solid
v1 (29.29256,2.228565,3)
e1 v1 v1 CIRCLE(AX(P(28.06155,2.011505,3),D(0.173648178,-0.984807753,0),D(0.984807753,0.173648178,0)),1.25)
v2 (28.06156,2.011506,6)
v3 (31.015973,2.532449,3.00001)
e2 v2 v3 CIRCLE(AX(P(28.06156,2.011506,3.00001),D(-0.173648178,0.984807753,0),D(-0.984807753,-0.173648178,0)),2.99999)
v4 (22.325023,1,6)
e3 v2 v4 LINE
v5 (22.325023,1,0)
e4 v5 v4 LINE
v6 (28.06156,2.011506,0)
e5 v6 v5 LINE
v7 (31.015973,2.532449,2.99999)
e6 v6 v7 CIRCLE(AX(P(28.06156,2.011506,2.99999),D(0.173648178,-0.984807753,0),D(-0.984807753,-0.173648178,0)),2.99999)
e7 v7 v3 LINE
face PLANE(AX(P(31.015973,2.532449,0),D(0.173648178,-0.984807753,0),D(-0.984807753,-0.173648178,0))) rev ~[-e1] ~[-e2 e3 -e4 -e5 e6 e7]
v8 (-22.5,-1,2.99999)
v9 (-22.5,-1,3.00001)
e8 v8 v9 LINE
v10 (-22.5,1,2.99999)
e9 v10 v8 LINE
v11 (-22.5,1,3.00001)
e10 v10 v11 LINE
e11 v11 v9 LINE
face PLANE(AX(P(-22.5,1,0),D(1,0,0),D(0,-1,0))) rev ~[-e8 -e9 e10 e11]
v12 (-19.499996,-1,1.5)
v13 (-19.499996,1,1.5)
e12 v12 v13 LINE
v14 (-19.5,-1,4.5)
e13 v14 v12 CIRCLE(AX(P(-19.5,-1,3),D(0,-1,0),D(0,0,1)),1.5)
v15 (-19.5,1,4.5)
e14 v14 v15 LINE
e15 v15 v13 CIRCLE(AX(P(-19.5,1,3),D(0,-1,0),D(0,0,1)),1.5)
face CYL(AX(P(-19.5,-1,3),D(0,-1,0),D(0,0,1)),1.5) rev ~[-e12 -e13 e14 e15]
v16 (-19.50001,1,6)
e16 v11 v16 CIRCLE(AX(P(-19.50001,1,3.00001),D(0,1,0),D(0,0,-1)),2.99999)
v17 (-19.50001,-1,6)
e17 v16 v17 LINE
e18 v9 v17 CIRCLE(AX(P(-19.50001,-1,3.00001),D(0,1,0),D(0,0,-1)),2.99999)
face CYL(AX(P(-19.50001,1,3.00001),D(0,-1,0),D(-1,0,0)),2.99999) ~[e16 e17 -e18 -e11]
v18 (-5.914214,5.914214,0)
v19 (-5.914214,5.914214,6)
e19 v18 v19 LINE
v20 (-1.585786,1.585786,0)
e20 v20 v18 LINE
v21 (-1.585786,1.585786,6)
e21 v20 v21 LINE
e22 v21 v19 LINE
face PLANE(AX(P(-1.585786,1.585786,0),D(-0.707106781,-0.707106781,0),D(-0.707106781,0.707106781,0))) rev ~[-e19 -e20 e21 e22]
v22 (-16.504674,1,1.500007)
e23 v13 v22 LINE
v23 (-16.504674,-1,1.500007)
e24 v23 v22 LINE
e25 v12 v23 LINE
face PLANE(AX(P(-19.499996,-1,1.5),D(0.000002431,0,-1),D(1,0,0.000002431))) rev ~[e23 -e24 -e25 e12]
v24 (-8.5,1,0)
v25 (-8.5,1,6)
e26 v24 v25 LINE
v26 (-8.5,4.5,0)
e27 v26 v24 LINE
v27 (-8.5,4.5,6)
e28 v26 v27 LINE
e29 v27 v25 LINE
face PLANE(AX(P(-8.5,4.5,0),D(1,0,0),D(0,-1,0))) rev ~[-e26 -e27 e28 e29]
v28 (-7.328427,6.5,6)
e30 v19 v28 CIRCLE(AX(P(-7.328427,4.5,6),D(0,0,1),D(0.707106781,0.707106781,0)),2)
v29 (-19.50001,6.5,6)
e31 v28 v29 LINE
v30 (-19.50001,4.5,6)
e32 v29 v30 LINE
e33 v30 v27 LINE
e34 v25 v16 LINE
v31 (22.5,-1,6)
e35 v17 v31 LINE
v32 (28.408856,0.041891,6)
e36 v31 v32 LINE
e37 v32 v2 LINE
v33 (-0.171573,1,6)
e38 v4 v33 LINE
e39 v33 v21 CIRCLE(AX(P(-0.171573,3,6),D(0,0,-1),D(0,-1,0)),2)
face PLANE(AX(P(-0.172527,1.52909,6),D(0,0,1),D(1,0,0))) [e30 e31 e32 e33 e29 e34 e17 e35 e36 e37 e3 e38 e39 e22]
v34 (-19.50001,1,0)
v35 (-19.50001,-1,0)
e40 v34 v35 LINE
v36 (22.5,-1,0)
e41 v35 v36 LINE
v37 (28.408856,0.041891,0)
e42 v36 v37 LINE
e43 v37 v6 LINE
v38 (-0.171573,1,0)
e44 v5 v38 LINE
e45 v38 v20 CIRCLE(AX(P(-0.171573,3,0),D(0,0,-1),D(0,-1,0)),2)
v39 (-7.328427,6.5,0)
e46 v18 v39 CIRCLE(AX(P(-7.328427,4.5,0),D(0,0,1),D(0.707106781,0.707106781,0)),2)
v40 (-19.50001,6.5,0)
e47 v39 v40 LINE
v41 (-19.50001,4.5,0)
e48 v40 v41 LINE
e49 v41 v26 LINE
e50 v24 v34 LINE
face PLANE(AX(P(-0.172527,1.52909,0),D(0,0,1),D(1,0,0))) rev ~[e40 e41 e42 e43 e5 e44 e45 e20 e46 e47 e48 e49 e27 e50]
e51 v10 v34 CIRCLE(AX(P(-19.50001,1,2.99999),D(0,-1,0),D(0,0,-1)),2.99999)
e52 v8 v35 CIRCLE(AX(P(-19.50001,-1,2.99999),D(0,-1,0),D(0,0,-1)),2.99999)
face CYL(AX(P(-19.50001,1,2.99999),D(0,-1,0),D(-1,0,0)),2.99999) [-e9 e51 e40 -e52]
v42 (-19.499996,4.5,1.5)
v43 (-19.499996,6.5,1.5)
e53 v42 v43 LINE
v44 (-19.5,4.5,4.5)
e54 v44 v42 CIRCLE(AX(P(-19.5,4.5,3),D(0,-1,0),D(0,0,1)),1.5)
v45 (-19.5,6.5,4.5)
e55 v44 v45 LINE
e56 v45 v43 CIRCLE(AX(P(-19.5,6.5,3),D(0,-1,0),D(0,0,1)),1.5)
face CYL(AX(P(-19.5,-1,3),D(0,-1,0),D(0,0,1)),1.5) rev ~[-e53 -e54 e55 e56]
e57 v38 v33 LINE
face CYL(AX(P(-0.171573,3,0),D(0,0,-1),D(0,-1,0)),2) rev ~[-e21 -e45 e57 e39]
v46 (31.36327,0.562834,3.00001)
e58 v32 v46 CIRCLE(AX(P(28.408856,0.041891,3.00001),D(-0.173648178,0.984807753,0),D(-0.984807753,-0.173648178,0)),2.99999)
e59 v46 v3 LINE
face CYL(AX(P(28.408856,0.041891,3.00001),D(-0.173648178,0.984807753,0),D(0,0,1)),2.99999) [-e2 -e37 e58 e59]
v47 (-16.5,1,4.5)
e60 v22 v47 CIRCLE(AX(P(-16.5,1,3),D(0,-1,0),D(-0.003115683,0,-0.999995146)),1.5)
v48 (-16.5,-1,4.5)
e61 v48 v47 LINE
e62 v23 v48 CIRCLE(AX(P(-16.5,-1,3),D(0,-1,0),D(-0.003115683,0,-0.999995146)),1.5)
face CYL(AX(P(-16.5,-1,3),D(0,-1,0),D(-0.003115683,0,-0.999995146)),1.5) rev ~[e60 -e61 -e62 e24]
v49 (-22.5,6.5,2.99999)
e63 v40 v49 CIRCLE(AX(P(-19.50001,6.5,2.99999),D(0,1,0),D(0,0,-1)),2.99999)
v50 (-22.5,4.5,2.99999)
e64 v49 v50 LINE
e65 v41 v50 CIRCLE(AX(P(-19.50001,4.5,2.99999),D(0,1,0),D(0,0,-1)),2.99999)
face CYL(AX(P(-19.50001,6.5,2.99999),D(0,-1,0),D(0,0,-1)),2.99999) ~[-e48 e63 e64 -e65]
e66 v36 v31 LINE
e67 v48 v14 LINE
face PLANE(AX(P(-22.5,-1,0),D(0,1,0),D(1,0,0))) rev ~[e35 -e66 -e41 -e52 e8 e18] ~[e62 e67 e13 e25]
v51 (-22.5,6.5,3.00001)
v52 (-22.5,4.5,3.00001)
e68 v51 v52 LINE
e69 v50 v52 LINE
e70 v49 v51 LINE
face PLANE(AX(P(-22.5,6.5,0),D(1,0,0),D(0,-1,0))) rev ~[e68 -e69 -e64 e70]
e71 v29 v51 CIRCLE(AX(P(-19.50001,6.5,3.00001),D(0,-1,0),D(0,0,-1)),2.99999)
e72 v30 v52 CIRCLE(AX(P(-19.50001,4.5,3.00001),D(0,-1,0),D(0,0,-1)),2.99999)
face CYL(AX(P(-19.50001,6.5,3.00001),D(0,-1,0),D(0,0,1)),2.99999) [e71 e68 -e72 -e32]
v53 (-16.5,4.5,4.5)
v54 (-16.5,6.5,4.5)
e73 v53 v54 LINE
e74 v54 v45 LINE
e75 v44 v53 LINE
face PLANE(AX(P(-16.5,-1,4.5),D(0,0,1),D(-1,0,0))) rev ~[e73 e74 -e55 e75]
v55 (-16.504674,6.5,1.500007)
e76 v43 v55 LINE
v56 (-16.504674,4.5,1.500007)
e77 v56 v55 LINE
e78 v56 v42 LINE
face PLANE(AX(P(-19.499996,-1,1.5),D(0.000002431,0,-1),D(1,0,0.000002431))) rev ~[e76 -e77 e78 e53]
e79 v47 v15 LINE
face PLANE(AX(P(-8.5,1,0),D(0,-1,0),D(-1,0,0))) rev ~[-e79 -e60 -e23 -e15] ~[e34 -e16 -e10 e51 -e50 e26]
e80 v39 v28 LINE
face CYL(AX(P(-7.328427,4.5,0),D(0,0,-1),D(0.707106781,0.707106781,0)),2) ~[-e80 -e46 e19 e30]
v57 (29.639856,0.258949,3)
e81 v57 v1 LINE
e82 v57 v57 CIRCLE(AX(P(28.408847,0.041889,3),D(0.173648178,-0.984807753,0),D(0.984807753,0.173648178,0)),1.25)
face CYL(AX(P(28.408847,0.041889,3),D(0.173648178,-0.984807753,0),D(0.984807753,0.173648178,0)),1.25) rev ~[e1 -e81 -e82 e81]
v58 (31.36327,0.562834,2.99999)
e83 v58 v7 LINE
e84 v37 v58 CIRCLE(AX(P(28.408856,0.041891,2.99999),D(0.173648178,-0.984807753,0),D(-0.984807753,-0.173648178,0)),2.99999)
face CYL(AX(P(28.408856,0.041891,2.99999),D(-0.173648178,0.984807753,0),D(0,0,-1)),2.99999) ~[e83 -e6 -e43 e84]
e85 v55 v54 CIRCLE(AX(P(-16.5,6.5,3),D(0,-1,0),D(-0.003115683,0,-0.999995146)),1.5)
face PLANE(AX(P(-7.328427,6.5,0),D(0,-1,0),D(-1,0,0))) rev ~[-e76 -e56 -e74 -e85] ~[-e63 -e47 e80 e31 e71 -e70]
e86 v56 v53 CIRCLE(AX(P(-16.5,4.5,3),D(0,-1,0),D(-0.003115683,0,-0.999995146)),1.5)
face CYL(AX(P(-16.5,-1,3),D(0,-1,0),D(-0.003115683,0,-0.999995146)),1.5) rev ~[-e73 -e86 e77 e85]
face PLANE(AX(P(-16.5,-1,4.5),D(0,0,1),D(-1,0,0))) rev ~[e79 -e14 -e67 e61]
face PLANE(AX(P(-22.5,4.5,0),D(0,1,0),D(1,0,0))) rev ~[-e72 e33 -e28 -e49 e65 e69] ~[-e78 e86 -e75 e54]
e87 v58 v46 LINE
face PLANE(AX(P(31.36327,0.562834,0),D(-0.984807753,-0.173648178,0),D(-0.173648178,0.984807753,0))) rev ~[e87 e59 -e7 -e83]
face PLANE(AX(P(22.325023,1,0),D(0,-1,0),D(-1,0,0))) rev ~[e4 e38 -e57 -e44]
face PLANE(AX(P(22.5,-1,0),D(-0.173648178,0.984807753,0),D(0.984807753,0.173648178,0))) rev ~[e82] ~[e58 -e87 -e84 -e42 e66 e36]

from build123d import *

# Parameters (mm, degrees)
F1_DEPTH = 6
F3_DEPTH = 25
F4_R     = 2.99999
F5_R     = 1.25
F6_DEPTH = 25
F7_R     = 2.99999


# Not quite as in the source:
# - a fillet or chamfer is up to 0.001 mm smaller than in the source, because OpenCascade refuses the exact size


with BuildPart() as f1:
    # F0 (on Top) → F1 (new body)
    with BuildSketch(Plane.XY):
        with BuildLine():
            Line((-22.5, -1), (22.5, -1))
            Line((22.5, -1), (31.3632697771, 0.562833599))
            Line((31.3632697771, 0.562833599), (31.0159734218, 2.532449105))
            Line((31.0159734218, 2.532449105), (22.3250226729, 1))
            Line((22.3250226729, 1), (-0.1715728753, 1))
            ThreePointArc((-0.1715728753, 1), (-0.93693974, 1.152240935), (-1.5857864376, 1.5857864376))
            Line((-1.5857864376, 1.5857864376), (-5.9142135624, 5.9142135624))
            ThreePointArc((-5.9142135624, 5.9142135624), (-6.56306026, 6.347759065), (-7.3284271247, 6.5))
            Line((-7.3284271247, 6.5), (-22.5, 6.5))
            Line((-22.5, 6.5), (-22.5, 4.5))
            Line((-22.5, 4.5), (-8.5, 4.5))
            Line((-8.5, 4.5), (-8.5, 1))
            Line((-8.5, 1), (-22.5, 1))
            Line((-22.5, 1), (-22.5, -1))
        make_face()
    extrude(amount=F1_DEPTH)

    # F2 (on face) → F3 (cut)
    with BuildSketch(Plane.XZ.offset(1)):
        with BuildLine():
            Line((-16.5, 4.5), (-19.5, 4.5))
            ThreePointArc((-19.5, 4.5), (-21, 2.999998177), (-19.499996354, 1.5))
            Line((-19.499996354, 1.5), (-16.5046735253, 1.5000072806))
            ThreePointArc((-16.5046735253, 1.5000072806), (-15.0000018202, 2.9976632345), (-16.5, 4.5))
        make_face()
    extrude(amount=-F3_DEPTH, mode=Mode.SUBTRACT)

    # F4 (radius 3 in the source; OpenCascade refuses exactly that, so slightly less here)
    f4_edges = [f1.edges().sort_by_distance(p)[0] for p in [
        (-22.5, 5.5, 6),
        (-22.5, 0, 6),
        (-22.5, 5.5, 0),
        (-22.5, 0, 0),
    ]]
    fillet(f4_edges, radius=F4_R)

    # F5 (on face) → F6 (cut)
    with BuildSketch(Plane(origin=(0.8494680878, -4.8175729228, 0), x_dir=(0.984807753, 0.1736481777, 0), z_dir=(0.1736481777, -0.984807753, 0))):
        with Locations((27.9845262651, 3)):
            Circle(F5_R)
    extrude(amount=-F6_DEPTH, mode=Mode.SUBTRACT)

    # F7 (radius 3 in the source; OpenCascade refuses exactly that, so slightly less here)
    f7_edges = [f1.edges().sort_by_distance(p)[0] for p in [
        (31.189622, 1.547641, 6),
        (31.189622, 1.547641, 0),
    ]]
    fillet(f7_edges, radius=F7_R)


solid = f1.part
